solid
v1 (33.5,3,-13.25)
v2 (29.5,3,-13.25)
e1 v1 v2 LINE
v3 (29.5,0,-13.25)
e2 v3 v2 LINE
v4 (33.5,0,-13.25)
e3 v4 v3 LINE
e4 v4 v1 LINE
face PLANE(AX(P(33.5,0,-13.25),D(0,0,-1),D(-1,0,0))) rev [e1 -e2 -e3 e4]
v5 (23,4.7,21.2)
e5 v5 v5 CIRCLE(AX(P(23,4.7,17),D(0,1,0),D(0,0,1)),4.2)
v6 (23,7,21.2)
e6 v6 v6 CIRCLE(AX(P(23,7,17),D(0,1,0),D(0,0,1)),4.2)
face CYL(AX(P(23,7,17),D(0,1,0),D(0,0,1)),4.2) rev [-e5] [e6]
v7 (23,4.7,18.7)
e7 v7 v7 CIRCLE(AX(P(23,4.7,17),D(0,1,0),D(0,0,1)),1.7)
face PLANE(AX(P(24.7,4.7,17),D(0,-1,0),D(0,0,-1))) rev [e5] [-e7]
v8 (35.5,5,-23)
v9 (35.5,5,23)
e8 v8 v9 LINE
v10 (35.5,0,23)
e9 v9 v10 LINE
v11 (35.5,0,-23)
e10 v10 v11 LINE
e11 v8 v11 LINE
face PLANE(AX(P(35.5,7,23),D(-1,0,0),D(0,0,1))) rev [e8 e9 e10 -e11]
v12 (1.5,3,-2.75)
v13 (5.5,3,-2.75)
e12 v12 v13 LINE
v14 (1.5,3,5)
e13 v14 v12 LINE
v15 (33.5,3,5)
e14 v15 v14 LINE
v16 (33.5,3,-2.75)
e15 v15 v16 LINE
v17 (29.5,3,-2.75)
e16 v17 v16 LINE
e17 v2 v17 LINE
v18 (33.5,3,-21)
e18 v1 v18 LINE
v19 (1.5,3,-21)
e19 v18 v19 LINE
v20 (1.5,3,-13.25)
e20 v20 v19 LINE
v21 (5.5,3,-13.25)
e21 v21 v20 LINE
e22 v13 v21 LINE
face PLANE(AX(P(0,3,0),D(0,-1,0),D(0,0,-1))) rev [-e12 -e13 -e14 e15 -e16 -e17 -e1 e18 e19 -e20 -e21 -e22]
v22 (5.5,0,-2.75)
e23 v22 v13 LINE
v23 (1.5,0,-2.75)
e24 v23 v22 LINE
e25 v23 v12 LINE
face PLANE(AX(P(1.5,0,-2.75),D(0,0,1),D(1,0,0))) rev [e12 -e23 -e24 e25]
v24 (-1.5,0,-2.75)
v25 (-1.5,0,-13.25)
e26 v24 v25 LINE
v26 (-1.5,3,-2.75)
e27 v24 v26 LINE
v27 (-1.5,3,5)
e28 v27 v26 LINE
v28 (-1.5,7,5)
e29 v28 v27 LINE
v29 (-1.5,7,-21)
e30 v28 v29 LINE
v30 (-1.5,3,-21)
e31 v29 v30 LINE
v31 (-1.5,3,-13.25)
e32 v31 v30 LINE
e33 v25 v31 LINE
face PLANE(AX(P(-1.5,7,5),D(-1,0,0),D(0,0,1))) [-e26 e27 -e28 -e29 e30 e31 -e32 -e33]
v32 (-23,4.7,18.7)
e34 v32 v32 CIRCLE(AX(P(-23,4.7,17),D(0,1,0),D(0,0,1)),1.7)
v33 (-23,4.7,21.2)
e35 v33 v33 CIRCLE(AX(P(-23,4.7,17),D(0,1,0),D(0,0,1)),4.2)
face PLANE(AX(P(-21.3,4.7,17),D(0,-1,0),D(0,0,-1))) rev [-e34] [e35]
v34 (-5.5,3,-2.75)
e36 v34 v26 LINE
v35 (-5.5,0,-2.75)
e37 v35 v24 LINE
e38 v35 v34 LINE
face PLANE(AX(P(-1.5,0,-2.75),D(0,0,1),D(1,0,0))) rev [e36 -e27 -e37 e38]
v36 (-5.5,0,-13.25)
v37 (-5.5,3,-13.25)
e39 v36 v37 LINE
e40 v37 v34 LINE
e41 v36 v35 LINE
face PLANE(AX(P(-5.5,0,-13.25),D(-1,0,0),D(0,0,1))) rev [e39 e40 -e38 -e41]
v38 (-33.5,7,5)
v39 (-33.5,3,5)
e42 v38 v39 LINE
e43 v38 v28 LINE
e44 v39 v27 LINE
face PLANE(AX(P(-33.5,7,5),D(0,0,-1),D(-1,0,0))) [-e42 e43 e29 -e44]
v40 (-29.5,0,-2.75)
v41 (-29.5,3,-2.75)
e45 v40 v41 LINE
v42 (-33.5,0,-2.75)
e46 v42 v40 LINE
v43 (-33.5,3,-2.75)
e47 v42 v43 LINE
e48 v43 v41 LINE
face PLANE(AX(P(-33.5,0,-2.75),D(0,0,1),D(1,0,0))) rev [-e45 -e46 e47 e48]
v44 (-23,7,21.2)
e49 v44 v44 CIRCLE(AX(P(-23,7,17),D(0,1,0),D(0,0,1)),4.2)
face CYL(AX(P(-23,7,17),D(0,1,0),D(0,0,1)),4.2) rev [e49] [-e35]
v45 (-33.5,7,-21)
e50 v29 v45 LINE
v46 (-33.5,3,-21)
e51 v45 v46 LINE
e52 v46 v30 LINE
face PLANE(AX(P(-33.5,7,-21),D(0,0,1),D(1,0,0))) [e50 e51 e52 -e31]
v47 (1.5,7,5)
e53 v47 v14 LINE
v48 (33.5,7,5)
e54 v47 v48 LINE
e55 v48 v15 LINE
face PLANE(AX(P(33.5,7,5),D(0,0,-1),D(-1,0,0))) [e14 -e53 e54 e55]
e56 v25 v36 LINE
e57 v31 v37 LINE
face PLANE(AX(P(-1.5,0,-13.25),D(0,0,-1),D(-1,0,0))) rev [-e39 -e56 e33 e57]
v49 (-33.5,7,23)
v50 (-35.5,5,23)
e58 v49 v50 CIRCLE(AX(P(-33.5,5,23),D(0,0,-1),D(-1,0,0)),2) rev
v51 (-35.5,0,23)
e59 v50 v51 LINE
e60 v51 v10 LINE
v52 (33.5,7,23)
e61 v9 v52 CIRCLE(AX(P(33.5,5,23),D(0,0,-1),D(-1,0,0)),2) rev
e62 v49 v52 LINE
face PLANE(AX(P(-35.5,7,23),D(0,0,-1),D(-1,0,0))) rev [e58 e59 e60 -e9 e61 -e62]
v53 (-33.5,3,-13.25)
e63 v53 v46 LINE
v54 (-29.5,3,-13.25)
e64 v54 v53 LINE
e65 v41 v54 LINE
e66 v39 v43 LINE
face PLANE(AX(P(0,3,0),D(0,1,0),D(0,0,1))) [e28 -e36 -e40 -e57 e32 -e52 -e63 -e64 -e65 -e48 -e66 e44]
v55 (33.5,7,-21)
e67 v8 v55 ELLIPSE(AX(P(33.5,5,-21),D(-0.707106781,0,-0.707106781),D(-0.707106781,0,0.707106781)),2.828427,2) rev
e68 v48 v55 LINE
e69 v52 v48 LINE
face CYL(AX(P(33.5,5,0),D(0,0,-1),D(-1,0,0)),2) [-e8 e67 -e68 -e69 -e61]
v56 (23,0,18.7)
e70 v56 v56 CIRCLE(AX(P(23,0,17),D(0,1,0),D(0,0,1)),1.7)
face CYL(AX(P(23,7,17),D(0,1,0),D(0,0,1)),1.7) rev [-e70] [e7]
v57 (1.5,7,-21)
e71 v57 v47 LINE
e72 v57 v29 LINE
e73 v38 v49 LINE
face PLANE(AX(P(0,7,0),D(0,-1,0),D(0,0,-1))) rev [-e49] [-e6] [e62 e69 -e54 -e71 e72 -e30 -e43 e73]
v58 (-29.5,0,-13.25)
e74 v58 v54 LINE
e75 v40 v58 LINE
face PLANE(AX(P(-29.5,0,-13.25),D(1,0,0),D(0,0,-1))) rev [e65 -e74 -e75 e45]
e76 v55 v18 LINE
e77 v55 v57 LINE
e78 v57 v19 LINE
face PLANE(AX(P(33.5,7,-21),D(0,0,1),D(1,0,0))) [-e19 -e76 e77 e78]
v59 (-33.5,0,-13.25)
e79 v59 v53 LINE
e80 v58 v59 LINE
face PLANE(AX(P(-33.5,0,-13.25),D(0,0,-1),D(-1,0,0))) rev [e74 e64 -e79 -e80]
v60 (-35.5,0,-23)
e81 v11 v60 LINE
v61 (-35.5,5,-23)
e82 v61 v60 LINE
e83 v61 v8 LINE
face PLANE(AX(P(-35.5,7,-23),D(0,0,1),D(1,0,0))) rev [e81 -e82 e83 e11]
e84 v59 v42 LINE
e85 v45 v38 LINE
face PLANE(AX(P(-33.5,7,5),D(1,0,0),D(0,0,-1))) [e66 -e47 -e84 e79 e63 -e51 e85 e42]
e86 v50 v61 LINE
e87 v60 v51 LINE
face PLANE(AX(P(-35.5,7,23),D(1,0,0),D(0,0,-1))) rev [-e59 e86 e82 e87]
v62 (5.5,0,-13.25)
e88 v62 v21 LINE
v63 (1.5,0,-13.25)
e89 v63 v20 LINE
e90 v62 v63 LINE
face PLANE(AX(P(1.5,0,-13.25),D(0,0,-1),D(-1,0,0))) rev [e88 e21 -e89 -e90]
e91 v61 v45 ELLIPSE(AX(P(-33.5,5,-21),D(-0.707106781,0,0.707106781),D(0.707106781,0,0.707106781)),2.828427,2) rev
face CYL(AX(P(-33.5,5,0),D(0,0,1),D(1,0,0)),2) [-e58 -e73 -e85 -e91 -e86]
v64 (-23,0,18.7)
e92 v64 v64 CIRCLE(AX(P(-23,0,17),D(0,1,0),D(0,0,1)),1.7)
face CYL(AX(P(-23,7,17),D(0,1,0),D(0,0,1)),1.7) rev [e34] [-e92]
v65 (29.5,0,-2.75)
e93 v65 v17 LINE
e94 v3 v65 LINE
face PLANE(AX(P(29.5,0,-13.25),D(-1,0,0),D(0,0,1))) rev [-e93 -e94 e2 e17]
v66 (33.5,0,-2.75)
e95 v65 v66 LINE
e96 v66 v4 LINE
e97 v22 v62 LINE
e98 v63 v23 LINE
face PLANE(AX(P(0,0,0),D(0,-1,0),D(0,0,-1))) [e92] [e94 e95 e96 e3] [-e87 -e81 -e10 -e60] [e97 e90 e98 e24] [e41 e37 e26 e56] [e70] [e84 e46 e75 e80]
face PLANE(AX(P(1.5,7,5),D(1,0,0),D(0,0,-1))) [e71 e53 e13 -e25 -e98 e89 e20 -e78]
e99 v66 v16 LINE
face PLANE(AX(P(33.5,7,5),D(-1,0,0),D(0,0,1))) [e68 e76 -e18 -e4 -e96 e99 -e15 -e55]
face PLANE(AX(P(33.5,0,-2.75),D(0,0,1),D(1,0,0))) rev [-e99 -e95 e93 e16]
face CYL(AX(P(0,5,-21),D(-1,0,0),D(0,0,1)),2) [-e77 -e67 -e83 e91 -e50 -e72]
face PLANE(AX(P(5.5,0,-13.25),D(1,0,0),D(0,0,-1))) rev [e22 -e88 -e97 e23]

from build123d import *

# Parameters (mm, degrees)
SKETCH1_W                                        = 71
SKETCH1_H                                        = 46
SKETCH1_W_2                                      = 32
SKETCH1_H_2                                      = 26
BOSS_EXTRUDE1_DEPTH                              = 7
SKETCH1_2_W                                      = 32
SKETCH1_2_H                                      = 26
BOSS_EXTRUDE2_DEPTH                              = 3
CBORE_FOR_M3_HEX_HEAD_MACHINE_SCREW1_D           = 3.4
CBORE_FOR_M3_HEX_HEAD_MACHINE_SCREW1_CBORE_D     = 8.4
CBORE_FOR_M3_HEX_HEAD_MACHINE_SCREW1_CBORE_DEPTH = 2.3
SKETCH6_W                                        = 4
SKETCH6_H                                        = 10.5
CUT_EXTRUDE1_DEPTH                               = 43.488233665
FILLET1_R                                        = 2


with BuildPart() as part:
    # Sketch1 → Boss-Extrude1 (new body)
    with BuildSketch(Plane(origin=(0, 0, 0), x_dir=(1, 0, 0), z_dir=(0, 1, 0))):
        Rectangle(SKETCH1_W, SKETCH1_H)
        with Locations((-17.5, 8)):
            Rectangle(SKETCH1_W_2, SKETCH1_H_2, mode=Mode.SUBTRACT)
        with Locations((17.5, 8)):
            Rectangle(SKETCH1_W_2, SKETCH1_H_2, mode=Mode.SUBTRACT)
    extrude(amount=BOSS_EXTRUDE1_DEPTH)

    # Sketch1<2> → Boss-Extrude2 (add)
    with BuildSketch(Plane(origin=(0, 0, 0), x_dir=(1, 0, 0), z_dir=(0, 1, 0))):
        with Locations((-17.5, 8)):
            Rectangle(SKETCH1_2_W, SKETCH1_2_H)
        with Locations((17.5, 8)):
            Rectangle(SKETCH1_2_W, SKETCH1_2_H)
    extrude(amount=BOSS_EXTRUDE2_DEPTH)

    # CBORE for M3 Hex Head Machine Screw1 (through all)
    with Locations(Plane(origin=(0, 7, 0), x_dir=(1, 0, 0), z_dir=(0, 1, 0))):
        with Locations((-23, -17), (23, -17)):
            CounterBoreHole(CBORE_FOR_M3_HEX_HEAD_MACHINE_SCREW1_D / 2, CBORE_FOR_M3_HEX_HEAD_MACHINE_SCREW1_CBORE_D / 2, CBORE_FOR_M3_HEX_HEAD_MACHINE_SCREW1_CBORE_DEPTH)

    # Sketch6 → Cut-Extrude1 (cut, through all)
    with BuildSketch(Plane(origin=(0, 3, 0), x_dir=(1, 0, 0), z_dir=(0, 1, 0))):
        with Locations((-31.5, 8)):
            Rectangle(SKETCH6_W, SKETCH6_H)
        with Locations((-3.5, 8)):
            Rectangle(SKETCH6_W, SKETCH6_H)
        with Locations((3.5, 8)):
            Rectangle(SKETCH6_W, SKETCH6_H)
        with Locations((31.5, 8)):
            Rectangle(SKETCH6_W, SKETCH6_H)
    extrude(amount=-CUT_EXTRUDE1_DEPTH, mode=Mode.SUBTRACT)

    # Fillet1
    fillet1_edges = [part.edges().sort_by_distance(p)[0] for p in [
        (-35.5, 7, 0),
        (35.5, 7, 0),
        (0, 7, -23),
    ]]
    fillet(fillet1_edges, radius=FILLET1_R - 0.0001)  # a hair under: the kernel refuses the full size


solid = part.part
